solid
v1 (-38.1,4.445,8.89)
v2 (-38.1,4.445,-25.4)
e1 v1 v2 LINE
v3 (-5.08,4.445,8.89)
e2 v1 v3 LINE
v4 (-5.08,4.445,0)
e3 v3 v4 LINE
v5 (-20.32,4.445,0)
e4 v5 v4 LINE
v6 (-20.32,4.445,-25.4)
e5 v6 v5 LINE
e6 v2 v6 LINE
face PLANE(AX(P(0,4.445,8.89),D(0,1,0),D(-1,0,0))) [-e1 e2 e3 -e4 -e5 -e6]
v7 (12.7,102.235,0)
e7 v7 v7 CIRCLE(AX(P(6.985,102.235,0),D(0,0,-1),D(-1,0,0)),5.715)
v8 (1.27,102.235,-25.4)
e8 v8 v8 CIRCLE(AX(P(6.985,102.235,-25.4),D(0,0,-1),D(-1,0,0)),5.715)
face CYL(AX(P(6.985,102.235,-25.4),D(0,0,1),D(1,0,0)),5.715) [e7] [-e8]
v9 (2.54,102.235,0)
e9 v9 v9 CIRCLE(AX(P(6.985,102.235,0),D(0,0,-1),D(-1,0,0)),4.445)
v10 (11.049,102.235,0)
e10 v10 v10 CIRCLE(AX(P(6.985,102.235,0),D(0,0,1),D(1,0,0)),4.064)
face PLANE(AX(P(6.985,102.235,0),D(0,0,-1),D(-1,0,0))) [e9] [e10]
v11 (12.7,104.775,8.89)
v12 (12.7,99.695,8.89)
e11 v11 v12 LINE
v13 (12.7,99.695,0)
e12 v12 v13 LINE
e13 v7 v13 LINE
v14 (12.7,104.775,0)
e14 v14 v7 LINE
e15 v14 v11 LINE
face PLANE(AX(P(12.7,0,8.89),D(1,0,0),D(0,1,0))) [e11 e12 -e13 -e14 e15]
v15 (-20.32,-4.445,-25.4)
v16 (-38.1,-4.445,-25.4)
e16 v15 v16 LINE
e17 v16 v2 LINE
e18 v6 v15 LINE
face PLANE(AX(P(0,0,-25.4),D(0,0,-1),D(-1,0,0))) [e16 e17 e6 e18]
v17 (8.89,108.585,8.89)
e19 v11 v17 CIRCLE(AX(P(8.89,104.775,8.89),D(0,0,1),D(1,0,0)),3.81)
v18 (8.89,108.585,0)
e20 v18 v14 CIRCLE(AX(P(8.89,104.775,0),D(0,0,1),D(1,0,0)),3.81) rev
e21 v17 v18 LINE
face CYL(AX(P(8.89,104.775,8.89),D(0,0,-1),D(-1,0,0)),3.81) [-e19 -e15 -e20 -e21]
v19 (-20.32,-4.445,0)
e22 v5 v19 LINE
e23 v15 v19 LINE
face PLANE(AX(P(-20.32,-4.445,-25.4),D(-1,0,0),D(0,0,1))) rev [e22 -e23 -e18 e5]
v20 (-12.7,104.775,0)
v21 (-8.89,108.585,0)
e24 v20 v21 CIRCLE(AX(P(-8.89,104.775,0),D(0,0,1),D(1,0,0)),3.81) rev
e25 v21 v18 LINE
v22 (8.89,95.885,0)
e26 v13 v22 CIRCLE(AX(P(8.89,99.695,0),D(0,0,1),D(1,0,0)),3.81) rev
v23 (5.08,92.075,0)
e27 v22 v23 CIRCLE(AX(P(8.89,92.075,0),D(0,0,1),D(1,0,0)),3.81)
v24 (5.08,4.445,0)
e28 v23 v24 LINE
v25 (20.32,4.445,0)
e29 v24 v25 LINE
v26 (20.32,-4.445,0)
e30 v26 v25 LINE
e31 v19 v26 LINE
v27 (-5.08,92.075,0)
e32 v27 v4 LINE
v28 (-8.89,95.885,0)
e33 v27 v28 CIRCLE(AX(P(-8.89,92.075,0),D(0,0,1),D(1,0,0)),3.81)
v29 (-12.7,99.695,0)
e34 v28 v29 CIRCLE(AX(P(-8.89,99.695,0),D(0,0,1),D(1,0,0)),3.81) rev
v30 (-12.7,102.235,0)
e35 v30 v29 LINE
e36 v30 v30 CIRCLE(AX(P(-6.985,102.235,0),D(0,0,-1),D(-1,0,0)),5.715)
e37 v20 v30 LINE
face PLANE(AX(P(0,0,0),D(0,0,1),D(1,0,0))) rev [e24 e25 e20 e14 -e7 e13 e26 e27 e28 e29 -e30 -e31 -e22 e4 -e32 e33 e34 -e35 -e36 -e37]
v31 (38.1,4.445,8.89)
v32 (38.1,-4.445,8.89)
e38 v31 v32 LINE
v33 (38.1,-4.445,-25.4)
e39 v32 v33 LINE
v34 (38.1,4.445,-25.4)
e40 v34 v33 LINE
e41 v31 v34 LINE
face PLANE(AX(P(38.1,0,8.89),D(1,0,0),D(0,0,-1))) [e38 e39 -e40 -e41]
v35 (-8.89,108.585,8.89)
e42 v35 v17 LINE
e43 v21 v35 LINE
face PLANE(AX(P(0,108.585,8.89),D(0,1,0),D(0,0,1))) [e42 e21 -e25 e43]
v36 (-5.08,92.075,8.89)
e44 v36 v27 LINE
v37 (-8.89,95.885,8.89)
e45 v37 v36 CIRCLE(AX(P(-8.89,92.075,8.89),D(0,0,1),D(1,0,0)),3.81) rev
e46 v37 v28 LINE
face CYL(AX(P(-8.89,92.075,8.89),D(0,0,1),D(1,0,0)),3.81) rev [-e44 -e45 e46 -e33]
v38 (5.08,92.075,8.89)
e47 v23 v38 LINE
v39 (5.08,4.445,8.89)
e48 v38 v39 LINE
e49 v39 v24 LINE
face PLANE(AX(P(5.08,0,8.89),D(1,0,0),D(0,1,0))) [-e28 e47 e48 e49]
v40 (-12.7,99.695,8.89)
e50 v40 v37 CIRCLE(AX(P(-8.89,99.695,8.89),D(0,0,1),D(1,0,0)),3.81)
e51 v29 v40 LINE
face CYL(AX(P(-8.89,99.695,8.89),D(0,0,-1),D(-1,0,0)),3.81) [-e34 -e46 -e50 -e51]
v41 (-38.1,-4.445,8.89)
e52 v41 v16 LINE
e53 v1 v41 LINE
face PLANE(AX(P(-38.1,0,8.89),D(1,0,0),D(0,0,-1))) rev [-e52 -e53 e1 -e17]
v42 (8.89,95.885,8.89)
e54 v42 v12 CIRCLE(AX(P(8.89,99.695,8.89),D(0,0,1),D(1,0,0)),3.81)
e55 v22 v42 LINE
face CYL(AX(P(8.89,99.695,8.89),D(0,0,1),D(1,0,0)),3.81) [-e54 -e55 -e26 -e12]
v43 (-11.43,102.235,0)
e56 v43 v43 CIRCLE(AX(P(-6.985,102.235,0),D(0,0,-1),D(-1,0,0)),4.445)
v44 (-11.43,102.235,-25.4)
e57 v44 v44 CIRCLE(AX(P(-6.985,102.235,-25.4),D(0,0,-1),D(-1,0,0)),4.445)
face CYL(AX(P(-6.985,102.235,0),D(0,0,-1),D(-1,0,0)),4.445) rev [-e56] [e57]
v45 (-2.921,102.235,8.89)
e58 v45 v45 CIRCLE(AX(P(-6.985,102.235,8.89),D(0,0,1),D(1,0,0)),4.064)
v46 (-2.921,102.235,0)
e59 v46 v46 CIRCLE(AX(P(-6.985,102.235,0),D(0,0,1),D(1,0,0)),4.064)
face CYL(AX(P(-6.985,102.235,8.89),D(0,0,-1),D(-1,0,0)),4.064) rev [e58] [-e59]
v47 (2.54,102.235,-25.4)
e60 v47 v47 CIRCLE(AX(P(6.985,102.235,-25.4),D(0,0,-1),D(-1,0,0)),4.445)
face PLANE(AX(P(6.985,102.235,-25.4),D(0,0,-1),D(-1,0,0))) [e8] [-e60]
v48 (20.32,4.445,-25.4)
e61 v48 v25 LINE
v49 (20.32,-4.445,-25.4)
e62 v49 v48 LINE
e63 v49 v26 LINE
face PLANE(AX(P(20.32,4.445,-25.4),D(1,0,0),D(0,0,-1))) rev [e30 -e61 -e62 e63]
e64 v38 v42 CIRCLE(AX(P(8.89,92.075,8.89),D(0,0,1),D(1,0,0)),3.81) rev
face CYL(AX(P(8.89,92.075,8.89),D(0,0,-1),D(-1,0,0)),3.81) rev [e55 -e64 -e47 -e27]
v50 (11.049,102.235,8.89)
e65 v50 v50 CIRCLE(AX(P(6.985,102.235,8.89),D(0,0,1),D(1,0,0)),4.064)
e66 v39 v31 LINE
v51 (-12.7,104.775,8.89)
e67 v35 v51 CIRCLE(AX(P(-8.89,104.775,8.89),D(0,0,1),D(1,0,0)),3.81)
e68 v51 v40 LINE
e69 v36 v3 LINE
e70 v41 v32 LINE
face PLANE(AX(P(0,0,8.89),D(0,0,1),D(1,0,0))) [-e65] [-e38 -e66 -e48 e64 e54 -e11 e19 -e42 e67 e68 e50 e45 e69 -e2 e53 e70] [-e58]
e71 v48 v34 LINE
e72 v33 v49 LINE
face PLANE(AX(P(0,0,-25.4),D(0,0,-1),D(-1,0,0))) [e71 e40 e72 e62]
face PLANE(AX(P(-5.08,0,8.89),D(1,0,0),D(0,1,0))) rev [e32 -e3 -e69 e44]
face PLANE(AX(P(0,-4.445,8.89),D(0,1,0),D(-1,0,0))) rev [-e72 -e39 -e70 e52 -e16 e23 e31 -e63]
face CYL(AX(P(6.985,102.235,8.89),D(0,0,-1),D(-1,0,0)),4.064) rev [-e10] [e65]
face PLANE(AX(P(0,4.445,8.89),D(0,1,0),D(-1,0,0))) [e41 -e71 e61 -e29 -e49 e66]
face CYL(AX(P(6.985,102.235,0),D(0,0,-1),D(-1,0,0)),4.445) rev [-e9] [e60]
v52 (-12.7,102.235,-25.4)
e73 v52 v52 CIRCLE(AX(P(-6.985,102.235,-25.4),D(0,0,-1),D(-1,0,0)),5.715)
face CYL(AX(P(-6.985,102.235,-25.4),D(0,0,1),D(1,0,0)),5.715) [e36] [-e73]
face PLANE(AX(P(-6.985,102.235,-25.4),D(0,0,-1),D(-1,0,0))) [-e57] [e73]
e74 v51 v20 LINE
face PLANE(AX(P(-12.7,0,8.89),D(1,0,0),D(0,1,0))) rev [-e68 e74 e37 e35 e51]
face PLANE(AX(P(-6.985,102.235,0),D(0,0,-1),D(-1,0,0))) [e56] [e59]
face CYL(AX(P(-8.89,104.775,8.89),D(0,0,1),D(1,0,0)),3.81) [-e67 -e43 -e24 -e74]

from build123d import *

# Parameters (mm, degrees)
SKETCH1_W           = 10.16
SKETCH1_H           = 91.44
SKETCH1_R           = 4.064
SKETCH1_W_2         = 76.2
SKETCH1_H_2         = 8.89
BOSS_EXTRUDE1_DEPTH = 8.89
SKETCH2_R           = 5.715
BOSS_EXTRUDE2_DEPTH = 25.4
SKETCH3_R           = 4.445
CUT_EXTRUDE1_DEPTH  = 25.4
FILLET1_R           = 3.81
SKETCH4_W           = 17.78
SKETCH4_H           = 8.89
BOSS_EXTRUDE3_DEPTH = 25.4


with BuildPart() as part:
    # Sketch1 → Boss-Extrude1 (new body)
    # profile 1 of 3: a face of its own
    with BuildSketch(Plane.XY):
        with Locations((0, 50.165)):
            Rectangle(SKETCH1_W, SKETCH1_H)
    # profile 2 of 3: a face of its own
    with BuildSketch(Plane.XY):
        Polygon((-12.7, 95.885), (-5.08, 95.885), (5.08, 95.885), (12.7, 95.885), (12.7, 108.585), (-12.7, 108.585), align=None)
        with Locations((-6.985, 102.235)):
            Circle(SKETCH1_R, mode=Mode.SUBTRACT)
        with Locations((6.985, 102.235)):
            Circle(SKETCH1_R, mode=Mode.SUBTRACT)
    # profile 3 of 3: a face of its own
    with BuildSketch(Plane.XY):
        Rectangle(SKETCH1_W_2, SKETCH1_H_2)
    extrude(amount=BOSS_EXTRUDE1_DEPTH)

    # Sketch2 → Boss-Extrude2 (add)
    with BuildSketch(Plane(origin=(0, 0, 0), x_dir=(-1, 0, 0), z_dir=(0, 0, -1))):
        with Locations((6.985, 102.235)):
            Circle(SKETCH2_R)
        with Locations(Location((-6.985, 102.235, 0), (0, 0, 180))):
            Circle(SKETCH2_R)
    extrude(amount=BOSS_EXTRUDE2_DEPTH)

    # Sketch3 → Cut-Extrude1 (cut)
    with BuildSketch(Plane(origin=(0, 0, -25.4), x_dir=(-1, 0, 0), z_dir=(0, 0, -1))):
        with Locations((6.985, 102.235)):
            Circle(SKETCH3_R)
        with Locations((-6.985, 102.235)):
            Circle(SKETCH3_R)
    extrude(amount=-CUT_EXTRUDE1_DEPTH, mode=Mode.SUBTRACT)

    # Fillet1
    fillet1_edges = [part.edges().sort_by_distance(p)[0] for p in [
        (-5.08, 95.885, 4.445),
        (-12.7, 95.885, 4.445),
        (5.08, 95.885, 4.445),
        (12.7, 95.885, 4.445),
        (12.7, 108.585, 4.445),
        (-12.7, 108.585, 4.445),
    ]]
    fillet(fillet1_edges, radius=FILLET1_R - 0.0001)  # a hair under: the kernel refuses the full size

    # Sketch4 → Boss-Extrude3 (add)
    with BuildSketch(Plane(origin=(0, 0, 0), x_dir=(-1, 0, 0), z_dir=(0, 0, -1))):
        with Locations((-29.21, 0)):
            Rectangle(SKETCH4_W, SKETCH4_H)
        with Locations((29.21, 0)):
            Rectangle(SKETCH4_W, SKETCH4_H)
    extrude(amount=BOSS_EXTRUDE3_DEPTH)


solid = part.part
